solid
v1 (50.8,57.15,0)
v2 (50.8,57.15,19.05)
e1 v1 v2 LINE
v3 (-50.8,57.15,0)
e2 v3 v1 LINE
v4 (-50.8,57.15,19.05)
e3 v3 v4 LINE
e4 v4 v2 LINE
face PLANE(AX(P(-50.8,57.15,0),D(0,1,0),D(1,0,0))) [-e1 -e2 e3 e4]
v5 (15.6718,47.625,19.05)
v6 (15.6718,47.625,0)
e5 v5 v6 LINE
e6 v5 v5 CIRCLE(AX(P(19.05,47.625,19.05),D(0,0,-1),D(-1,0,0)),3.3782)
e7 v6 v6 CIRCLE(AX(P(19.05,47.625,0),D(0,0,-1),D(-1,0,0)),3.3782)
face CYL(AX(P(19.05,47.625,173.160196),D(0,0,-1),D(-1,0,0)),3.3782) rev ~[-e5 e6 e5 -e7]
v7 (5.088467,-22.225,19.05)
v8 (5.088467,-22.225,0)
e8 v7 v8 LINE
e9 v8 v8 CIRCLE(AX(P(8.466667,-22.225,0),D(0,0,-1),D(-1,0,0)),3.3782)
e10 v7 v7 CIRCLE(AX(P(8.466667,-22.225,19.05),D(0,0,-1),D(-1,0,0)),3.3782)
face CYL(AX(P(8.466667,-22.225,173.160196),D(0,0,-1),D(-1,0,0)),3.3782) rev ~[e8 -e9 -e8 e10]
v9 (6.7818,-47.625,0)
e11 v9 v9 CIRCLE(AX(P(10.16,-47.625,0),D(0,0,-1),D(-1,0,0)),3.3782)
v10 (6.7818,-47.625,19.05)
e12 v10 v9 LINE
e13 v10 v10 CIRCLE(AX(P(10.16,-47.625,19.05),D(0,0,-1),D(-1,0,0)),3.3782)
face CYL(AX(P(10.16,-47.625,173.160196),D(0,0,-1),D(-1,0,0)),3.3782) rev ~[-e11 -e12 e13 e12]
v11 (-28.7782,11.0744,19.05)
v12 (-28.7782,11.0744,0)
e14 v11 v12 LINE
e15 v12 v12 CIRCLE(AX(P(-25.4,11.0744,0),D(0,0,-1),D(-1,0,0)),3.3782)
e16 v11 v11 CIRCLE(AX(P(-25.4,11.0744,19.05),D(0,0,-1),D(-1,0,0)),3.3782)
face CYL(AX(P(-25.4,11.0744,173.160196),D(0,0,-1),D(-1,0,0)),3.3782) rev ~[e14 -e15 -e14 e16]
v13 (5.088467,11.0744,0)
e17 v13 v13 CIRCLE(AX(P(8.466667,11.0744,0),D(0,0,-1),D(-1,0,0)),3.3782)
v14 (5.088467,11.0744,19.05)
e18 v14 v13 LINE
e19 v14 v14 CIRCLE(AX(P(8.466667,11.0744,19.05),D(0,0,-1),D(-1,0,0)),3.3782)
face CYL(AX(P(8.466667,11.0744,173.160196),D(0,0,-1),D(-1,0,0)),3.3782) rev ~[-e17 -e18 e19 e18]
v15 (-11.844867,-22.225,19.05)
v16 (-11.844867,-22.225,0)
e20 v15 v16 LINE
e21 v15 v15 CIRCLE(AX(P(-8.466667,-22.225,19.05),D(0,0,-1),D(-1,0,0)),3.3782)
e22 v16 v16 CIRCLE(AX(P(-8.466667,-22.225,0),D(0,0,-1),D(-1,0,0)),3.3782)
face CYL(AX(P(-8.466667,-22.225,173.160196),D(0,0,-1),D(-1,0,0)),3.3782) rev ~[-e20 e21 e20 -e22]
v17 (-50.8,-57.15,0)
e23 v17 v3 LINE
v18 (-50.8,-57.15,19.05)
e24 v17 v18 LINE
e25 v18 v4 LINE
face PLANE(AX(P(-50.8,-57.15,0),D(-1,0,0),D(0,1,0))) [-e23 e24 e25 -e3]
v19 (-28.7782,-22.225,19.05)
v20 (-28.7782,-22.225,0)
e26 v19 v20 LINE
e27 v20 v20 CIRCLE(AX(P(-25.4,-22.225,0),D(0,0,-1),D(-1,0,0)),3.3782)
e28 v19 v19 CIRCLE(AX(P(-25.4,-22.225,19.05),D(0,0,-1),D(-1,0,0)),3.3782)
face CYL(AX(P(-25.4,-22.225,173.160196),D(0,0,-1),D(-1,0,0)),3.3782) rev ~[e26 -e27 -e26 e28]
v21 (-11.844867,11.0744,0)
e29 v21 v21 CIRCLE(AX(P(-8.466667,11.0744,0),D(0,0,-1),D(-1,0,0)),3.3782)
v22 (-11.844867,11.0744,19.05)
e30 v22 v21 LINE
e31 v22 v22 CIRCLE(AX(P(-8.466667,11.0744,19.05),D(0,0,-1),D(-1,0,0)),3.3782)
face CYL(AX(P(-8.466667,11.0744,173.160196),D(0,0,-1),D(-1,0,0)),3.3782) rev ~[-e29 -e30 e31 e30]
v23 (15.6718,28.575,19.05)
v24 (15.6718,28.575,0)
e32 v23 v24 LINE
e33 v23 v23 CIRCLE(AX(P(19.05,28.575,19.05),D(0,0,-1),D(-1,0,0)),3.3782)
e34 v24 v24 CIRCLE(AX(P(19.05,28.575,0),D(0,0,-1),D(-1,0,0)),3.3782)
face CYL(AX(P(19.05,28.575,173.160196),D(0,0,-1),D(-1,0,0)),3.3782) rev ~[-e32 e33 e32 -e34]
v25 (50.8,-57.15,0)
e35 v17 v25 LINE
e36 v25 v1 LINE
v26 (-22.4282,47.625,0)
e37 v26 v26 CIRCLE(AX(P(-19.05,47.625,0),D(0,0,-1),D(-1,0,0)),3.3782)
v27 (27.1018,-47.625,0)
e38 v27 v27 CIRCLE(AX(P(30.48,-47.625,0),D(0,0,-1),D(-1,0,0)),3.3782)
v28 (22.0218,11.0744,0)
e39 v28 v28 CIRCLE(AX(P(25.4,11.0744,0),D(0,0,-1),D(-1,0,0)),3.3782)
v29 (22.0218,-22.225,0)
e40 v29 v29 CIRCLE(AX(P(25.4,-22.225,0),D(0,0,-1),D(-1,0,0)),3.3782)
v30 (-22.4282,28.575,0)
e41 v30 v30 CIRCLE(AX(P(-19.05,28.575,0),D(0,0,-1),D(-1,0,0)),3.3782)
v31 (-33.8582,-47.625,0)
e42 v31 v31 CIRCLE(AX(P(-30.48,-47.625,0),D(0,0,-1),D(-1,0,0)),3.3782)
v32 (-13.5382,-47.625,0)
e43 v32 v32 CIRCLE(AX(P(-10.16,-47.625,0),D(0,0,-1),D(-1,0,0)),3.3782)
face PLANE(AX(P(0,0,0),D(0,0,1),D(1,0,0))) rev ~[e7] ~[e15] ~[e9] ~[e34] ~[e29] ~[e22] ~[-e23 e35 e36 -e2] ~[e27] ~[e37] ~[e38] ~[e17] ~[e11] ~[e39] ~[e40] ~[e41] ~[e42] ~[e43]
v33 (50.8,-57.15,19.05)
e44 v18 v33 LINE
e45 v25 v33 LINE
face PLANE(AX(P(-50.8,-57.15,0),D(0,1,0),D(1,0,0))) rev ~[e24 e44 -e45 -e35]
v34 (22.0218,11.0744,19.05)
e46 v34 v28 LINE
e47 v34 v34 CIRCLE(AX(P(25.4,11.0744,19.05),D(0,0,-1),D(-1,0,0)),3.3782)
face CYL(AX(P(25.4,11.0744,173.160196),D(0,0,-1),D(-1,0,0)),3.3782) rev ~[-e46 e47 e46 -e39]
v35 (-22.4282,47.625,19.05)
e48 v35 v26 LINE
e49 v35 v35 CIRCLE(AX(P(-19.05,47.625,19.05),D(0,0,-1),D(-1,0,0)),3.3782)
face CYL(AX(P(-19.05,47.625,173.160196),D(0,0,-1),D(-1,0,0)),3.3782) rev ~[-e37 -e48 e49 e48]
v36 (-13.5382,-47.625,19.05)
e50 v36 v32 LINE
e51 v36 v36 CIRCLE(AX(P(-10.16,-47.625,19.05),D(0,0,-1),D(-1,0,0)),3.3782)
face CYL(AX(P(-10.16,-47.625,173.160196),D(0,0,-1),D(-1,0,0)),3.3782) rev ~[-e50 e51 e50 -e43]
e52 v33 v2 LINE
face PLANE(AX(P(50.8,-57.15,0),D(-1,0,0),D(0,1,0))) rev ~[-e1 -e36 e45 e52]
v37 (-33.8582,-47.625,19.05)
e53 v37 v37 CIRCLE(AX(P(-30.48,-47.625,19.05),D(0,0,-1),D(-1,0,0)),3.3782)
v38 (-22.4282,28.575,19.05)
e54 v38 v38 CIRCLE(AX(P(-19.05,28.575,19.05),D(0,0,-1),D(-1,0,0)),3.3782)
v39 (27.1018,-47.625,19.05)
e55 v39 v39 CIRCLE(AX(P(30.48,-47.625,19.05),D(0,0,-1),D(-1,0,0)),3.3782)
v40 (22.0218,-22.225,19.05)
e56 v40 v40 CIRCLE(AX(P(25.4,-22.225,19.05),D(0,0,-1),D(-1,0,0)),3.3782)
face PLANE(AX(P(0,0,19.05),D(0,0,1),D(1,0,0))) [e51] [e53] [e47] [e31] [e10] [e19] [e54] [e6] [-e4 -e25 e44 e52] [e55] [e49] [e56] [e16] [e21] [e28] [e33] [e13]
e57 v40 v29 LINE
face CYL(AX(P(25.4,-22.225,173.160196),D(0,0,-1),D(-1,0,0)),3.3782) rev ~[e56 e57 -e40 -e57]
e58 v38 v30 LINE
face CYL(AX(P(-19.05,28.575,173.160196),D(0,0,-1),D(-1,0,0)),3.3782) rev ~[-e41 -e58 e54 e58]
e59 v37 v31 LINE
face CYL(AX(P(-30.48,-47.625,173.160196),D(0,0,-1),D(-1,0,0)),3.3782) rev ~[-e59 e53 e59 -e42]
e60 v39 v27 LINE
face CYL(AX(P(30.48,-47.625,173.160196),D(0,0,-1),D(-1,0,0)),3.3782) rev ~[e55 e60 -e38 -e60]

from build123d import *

# Parameters (mm, degrees)
F0_W     = 101.6
F0_H     = 114.3
F1_DEPTH = 19.05
F3_D     = 6.7564


# Not quite as in the source:
# - a feature names something its author has since deleted; it is built from what else it names


with BuildPart() as f1:
    # F0 (on Top) → F1 (new body)
    with BuildSketch(Plane.XY):
        Rectangle(F0_W, F0_H)
    extrude(amount=F1_DEPTH)

    # F3 (through all)
    with Locations(Plane.XY.offset(19.05)):
        with Locations((-30.48, -47.625), (-10.16, -47.625), (10.16, -47.625), (30.48, -47.625), (-19.05, 47.625), (-25.4, 11.0744), (-25.4, -22.225), (-8.4666666667, -22.225), (-8.4666666667, 11.0744), (8.4666666667, 11.0744), (8.4666666667, -22.225), (25.4, -22.225), (25.4, 11.0744), (19.05, 47.625), (-19.05, 28.575), (19.05, 28.575)):
            Hole(F3_D / 2)


solid = f1.part
